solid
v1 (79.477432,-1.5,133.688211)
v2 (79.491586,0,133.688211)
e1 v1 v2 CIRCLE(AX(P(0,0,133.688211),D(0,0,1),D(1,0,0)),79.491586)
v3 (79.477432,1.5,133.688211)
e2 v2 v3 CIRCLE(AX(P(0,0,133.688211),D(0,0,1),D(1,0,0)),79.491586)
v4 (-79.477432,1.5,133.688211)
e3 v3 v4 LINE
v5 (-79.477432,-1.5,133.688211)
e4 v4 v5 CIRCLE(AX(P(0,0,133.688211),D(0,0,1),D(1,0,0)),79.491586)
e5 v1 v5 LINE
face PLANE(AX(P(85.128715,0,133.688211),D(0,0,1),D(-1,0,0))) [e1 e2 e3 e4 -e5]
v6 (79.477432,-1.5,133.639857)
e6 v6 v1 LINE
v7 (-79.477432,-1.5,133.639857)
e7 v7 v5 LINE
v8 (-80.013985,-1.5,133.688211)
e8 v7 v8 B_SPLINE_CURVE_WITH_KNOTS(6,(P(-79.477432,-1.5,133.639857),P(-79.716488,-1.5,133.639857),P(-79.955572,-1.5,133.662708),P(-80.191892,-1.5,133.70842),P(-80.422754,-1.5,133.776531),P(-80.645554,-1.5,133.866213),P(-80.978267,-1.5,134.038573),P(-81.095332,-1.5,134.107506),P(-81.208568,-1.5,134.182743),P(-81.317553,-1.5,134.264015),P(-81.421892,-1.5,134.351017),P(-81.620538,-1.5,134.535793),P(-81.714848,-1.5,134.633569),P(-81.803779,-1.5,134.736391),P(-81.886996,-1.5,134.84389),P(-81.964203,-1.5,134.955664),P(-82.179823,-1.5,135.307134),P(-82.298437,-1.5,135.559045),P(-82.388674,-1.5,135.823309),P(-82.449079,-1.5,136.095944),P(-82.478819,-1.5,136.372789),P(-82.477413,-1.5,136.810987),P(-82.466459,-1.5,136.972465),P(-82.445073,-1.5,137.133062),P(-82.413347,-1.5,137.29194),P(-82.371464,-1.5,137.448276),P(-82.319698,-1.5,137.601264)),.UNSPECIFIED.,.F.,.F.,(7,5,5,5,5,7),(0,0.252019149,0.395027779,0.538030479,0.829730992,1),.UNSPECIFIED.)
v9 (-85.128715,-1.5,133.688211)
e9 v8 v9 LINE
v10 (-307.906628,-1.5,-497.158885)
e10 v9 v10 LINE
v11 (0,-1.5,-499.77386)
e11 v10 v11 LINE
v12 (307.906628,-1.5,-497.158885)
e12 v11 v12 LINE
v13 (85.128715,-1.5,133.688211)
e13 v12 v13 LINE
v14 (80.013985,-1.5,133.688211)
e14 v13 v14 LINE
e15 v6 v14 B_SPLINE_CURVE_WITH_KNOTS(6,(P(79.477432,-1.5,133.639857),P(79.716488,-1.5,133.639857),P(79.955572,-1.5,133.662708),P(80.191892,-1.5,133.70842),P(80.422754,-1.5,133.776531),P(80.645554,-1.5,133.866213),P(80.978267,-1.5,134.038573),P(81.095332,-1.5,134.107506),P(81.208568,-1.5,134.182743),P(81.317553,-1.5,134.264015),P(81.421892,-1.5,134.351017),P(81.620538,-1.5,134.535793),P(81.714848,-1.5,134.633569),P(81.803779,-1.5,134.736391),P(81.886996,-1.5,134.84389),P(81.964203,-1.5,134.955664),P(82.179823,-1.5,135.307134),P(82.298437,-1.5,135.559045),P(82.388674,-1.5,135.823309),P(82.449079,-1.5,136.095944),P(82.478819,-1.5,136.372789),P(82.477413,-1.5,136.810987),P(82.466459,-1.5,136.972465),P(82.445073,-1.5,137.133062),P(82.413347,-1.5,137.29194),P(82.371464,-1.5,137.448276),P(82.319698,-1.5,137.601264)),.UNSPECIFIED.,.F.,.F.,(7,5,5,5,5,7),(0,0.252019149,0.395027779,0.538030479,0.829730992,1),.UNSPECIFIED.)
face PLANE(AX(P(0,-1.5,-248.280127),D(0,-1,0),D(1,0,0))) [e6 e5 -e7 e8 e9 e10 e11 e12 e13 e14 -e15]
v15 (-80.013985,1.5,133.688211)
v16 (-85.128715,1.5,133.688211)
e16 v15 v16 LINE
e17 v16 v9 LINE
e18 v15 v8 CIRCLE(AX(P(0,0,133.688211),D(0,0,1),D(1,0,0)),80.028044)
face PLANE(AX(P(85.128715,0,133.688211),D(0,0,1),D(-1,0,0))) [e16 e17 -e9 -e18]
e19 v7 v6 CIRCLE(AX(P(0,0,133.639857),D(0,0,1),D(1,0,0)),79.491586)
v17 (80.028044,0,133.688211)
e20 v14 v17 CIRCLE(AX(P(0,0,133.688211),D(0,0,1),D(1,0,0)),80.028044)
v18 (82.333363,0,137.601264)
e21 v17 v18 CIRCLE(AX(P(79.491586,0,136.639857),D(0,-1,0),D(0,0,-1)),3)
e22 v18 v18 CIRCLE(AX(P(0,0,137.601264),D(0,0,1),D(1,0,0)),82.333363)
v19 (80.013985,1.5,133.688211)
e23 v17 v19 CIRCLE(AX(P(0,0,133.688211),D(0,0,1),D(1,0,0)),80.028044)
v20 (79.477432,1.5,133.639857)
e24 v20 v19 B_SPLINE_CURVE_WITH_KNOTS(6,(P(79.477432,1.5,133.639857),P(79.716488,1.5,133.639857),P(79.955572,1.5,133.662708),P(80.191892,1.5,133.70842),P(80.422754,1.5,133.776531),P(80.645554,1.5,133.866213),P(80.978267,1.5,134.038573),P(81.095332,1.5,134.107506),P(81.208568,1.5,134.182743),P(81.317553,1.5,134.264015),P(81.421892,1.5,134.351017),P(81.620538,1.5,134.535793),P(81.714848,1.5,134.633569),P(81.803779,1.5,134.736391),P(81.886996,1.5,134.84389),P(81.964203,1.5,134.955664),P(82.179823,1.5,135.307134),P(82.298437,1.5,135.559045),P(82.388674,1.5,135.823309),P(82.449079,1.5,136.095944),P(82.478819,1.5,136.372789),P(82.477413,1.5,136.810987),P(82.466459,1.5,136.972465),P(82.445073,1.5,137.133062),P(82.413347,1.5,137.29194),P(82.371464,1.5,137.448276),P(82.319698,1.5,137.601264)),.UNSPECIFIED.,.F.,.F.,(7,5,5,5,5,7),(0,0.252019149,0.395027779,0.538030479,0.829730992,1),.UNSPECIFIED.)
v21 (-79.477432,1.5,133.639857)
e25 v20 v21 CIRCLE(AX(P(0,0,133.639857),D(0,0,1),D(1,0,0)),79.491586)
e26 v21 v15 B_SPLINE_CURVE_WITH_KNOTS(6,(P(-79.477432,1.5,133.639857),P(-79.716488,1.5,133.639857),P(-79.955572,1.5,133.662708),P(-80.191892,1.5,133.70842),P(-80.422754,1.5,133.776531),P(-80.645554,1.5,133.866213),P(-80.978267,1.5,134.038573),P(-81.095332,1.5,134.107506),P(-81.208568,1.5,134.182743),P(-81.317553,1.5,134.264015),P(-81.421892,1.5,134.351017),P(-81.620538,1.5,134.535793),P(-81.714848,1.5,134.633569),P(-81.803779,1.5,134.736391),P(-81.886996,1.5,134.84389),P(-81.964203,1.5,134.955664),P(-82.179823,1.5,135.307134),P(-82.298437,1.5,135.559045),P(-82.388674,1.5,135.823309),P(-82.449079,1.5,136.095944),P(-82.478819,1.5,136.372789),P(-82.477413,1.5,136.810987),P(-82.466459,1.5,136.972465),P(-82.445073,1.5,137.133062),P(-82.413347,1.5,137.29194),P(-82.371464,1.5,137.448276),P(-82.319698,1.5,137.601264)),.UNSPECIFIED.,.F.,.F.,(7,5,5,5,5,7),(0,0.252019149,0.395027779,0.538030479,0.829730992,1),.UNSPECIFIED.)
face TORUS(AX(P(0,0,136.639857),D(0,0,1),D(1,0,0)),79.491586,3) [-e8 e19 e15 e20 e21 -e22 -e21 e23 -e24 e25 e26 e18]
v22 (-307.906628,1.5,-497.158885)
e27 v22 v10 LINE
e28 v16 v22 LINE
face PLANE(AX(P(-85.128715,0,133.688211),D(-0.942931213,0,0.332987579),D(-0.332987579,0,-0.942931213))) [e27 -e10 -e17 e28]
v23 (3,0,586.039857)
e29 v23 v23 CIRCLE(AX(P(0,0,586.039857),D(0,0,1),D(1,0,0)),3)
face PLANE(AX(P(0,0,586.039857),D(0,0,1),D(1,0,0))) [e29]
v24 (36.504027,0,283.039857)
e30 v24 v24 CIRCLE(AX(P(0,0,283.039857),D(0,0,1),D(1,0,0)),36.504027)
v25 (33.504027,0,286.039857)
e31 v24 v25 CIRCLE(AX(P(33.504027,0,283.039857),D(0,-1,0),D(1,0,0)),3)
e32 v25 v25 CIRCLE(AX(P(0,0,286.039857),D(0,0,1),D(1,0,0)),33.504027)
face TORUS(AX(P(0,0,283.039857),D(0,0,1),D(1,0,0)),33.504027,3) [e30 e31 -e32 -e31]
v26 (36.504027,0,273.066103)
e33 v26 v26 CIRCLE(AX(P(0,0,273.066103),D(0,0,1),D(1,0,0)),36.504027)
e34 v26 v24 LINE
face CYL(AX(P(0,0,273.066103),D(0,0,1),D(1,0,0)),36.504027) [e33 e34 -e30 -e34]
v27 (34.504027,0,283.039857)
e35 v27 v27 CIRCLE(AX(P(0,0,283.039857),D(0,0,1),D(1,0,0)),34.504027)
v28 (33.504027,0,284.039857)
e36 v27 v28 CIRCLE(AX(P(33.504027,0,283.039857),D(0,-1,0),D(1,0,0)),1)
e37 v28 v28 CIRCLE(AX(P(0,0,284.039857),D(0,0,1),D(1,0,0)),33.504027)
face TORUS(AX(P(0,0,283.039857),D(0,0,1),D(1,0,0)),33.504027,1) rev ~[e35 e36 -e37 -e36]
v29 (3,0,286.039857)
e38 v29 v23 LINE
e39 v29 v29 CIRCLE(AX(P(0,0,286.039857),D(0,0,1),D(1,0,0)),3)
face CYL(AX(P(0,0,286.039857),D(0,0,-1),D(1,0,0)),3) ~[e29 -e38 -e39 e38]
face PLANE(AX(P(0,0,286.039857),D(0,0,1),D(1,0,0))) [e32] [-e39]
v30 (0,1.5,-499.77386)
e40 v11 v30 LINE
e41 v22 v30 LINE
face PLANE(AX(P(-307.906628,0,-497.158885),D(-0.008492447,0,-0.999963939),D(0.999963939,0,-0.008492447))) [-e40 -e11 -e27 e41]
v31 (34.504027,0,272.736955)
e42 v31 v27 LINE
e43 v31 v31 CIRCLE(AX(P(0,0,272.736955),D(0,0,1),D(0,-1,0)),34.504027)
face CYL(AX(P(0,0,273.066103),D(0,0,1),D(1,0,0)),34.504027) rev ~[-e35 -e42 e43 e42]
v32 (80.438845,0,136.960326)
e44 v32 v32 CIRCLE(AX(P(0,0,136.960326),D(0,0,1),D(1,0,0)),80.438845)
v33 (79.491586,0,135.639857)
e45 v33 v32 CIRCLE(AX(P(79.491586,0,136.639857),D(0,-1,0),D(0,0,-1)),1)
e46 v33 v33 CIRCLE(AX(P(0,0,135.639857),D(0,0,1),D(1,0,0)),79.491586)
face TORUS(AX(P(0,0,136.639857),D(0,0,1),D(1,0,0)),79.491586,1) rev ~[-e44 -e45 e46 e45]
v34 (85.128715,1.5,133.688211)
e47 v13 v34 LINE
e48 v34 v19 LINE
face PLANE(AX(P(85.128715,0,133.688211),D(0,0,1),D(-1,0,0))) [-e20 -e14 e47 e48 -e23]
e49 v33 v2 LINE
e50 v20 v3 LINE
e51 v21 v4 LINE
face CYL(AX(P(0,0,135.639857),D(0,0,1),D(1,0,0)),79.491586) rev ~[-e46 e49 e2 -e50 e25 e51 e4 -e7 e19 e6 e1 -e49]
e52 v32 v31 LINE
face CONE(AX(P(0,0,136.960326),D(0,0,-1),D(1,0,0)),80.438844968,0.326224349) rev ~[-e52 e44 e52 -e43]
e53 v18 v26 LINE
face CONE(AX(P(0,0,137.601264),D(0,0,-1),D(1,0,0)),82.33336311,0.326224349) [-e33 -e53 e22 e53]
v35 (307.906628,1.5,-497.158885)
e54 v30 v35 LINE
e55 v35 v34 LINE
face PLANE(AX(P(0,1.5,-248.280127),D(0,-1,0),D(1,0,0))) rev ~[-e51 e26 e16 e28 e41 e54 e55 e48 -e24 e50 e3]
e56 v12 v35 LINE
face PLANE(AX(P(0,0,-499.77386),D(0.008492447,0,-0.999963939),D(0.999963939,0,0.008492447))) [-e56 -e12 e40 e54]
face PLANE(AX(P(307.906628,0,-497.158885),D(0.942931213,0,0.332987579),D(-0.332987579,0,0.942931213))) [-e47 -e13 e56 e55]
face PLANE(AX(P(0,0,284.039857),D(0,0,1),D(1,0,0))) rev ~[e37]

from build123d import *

# Parameters (mm, degrees)
F2_T     = -2
F3_R     = 3
F4_DEPTH = 300
F6_DEPTH = 1.5


# Not quite as in the source:
# - a shell that OpenCascade refuses in one call is made with other operations: the cavity is built on its own and cut out


with BuildPart() as f1:
    # F0 (on Front) → F1 (revolve)
    with BuildSketch(Plane.XZ):
        with BuildLine():
            Line((33.5040265024, 286.039857173), (0, 286.039857173))
            Line((0, 286.039857173), (0, 133.639857173))
            Line((0, 133.639857173), (79.491585897, 133.639857173))
            ThreePointArc((79.491585897, 133.639857173), (81.9292301706, 134.8911746988), (82.33336311, 137.6012635761))
            Line((82.33336311, 137.6012635761), (36.5040265024, 273.0661034584))
            Line((36.5040265024, 273.0661034584), (36.5040265024, 283.039857173))
            ThreePointArc((36.5040265024, 283.039857173), (35.6253468459, 285.1611775165), (33.5040265024, 286.039857173))
        make_face()
    revolve(axis=Axis((0, 0, 248.212441802), (0, 0, 1)))

    # F2: a shell. OpenCascade refuses it in one call, so the cavity is built on its own and cut out:
    # the body offset inwards by the wall thickness, plus a prism from it out through each open face.
    f2_core = offset(f1.part, amount=F2_T, kind=Kind.INTERSECTION, mode=Mode.PRIVATE)
    f2_exits = [f2_core.faces().sort_by_distance(p)[0] for p in [
        (0, 0, 135.639857),
    ]]
    add(f2_core, mode=Mode.SUBTRACT)
    extrude(f2_exits, amount=-F2_T, mode=Mode.SUBTRACT)

    # F3 (on face) → F4 (join)
    with BuildSketch(Plane.XY.offset(286.039857173)):
        Circle(F3_R)
    extrude(amount=F4_DEPTH)

    # F5 (on Front) → F6 (join, symmetric)
    with BuildSketch(Plane.XZ):
        Polygon((85.1287149498, 133.688211441), (0, 133.688211441), (-85.1287149498, 133.688211441), (-307.906627655, -497.1588850021), (0, -499.7738599777), (307.906627655, -497.1588850021), align=None)
    extrude(amount=F6_DEPTH, both=True)


solid = f1.part
